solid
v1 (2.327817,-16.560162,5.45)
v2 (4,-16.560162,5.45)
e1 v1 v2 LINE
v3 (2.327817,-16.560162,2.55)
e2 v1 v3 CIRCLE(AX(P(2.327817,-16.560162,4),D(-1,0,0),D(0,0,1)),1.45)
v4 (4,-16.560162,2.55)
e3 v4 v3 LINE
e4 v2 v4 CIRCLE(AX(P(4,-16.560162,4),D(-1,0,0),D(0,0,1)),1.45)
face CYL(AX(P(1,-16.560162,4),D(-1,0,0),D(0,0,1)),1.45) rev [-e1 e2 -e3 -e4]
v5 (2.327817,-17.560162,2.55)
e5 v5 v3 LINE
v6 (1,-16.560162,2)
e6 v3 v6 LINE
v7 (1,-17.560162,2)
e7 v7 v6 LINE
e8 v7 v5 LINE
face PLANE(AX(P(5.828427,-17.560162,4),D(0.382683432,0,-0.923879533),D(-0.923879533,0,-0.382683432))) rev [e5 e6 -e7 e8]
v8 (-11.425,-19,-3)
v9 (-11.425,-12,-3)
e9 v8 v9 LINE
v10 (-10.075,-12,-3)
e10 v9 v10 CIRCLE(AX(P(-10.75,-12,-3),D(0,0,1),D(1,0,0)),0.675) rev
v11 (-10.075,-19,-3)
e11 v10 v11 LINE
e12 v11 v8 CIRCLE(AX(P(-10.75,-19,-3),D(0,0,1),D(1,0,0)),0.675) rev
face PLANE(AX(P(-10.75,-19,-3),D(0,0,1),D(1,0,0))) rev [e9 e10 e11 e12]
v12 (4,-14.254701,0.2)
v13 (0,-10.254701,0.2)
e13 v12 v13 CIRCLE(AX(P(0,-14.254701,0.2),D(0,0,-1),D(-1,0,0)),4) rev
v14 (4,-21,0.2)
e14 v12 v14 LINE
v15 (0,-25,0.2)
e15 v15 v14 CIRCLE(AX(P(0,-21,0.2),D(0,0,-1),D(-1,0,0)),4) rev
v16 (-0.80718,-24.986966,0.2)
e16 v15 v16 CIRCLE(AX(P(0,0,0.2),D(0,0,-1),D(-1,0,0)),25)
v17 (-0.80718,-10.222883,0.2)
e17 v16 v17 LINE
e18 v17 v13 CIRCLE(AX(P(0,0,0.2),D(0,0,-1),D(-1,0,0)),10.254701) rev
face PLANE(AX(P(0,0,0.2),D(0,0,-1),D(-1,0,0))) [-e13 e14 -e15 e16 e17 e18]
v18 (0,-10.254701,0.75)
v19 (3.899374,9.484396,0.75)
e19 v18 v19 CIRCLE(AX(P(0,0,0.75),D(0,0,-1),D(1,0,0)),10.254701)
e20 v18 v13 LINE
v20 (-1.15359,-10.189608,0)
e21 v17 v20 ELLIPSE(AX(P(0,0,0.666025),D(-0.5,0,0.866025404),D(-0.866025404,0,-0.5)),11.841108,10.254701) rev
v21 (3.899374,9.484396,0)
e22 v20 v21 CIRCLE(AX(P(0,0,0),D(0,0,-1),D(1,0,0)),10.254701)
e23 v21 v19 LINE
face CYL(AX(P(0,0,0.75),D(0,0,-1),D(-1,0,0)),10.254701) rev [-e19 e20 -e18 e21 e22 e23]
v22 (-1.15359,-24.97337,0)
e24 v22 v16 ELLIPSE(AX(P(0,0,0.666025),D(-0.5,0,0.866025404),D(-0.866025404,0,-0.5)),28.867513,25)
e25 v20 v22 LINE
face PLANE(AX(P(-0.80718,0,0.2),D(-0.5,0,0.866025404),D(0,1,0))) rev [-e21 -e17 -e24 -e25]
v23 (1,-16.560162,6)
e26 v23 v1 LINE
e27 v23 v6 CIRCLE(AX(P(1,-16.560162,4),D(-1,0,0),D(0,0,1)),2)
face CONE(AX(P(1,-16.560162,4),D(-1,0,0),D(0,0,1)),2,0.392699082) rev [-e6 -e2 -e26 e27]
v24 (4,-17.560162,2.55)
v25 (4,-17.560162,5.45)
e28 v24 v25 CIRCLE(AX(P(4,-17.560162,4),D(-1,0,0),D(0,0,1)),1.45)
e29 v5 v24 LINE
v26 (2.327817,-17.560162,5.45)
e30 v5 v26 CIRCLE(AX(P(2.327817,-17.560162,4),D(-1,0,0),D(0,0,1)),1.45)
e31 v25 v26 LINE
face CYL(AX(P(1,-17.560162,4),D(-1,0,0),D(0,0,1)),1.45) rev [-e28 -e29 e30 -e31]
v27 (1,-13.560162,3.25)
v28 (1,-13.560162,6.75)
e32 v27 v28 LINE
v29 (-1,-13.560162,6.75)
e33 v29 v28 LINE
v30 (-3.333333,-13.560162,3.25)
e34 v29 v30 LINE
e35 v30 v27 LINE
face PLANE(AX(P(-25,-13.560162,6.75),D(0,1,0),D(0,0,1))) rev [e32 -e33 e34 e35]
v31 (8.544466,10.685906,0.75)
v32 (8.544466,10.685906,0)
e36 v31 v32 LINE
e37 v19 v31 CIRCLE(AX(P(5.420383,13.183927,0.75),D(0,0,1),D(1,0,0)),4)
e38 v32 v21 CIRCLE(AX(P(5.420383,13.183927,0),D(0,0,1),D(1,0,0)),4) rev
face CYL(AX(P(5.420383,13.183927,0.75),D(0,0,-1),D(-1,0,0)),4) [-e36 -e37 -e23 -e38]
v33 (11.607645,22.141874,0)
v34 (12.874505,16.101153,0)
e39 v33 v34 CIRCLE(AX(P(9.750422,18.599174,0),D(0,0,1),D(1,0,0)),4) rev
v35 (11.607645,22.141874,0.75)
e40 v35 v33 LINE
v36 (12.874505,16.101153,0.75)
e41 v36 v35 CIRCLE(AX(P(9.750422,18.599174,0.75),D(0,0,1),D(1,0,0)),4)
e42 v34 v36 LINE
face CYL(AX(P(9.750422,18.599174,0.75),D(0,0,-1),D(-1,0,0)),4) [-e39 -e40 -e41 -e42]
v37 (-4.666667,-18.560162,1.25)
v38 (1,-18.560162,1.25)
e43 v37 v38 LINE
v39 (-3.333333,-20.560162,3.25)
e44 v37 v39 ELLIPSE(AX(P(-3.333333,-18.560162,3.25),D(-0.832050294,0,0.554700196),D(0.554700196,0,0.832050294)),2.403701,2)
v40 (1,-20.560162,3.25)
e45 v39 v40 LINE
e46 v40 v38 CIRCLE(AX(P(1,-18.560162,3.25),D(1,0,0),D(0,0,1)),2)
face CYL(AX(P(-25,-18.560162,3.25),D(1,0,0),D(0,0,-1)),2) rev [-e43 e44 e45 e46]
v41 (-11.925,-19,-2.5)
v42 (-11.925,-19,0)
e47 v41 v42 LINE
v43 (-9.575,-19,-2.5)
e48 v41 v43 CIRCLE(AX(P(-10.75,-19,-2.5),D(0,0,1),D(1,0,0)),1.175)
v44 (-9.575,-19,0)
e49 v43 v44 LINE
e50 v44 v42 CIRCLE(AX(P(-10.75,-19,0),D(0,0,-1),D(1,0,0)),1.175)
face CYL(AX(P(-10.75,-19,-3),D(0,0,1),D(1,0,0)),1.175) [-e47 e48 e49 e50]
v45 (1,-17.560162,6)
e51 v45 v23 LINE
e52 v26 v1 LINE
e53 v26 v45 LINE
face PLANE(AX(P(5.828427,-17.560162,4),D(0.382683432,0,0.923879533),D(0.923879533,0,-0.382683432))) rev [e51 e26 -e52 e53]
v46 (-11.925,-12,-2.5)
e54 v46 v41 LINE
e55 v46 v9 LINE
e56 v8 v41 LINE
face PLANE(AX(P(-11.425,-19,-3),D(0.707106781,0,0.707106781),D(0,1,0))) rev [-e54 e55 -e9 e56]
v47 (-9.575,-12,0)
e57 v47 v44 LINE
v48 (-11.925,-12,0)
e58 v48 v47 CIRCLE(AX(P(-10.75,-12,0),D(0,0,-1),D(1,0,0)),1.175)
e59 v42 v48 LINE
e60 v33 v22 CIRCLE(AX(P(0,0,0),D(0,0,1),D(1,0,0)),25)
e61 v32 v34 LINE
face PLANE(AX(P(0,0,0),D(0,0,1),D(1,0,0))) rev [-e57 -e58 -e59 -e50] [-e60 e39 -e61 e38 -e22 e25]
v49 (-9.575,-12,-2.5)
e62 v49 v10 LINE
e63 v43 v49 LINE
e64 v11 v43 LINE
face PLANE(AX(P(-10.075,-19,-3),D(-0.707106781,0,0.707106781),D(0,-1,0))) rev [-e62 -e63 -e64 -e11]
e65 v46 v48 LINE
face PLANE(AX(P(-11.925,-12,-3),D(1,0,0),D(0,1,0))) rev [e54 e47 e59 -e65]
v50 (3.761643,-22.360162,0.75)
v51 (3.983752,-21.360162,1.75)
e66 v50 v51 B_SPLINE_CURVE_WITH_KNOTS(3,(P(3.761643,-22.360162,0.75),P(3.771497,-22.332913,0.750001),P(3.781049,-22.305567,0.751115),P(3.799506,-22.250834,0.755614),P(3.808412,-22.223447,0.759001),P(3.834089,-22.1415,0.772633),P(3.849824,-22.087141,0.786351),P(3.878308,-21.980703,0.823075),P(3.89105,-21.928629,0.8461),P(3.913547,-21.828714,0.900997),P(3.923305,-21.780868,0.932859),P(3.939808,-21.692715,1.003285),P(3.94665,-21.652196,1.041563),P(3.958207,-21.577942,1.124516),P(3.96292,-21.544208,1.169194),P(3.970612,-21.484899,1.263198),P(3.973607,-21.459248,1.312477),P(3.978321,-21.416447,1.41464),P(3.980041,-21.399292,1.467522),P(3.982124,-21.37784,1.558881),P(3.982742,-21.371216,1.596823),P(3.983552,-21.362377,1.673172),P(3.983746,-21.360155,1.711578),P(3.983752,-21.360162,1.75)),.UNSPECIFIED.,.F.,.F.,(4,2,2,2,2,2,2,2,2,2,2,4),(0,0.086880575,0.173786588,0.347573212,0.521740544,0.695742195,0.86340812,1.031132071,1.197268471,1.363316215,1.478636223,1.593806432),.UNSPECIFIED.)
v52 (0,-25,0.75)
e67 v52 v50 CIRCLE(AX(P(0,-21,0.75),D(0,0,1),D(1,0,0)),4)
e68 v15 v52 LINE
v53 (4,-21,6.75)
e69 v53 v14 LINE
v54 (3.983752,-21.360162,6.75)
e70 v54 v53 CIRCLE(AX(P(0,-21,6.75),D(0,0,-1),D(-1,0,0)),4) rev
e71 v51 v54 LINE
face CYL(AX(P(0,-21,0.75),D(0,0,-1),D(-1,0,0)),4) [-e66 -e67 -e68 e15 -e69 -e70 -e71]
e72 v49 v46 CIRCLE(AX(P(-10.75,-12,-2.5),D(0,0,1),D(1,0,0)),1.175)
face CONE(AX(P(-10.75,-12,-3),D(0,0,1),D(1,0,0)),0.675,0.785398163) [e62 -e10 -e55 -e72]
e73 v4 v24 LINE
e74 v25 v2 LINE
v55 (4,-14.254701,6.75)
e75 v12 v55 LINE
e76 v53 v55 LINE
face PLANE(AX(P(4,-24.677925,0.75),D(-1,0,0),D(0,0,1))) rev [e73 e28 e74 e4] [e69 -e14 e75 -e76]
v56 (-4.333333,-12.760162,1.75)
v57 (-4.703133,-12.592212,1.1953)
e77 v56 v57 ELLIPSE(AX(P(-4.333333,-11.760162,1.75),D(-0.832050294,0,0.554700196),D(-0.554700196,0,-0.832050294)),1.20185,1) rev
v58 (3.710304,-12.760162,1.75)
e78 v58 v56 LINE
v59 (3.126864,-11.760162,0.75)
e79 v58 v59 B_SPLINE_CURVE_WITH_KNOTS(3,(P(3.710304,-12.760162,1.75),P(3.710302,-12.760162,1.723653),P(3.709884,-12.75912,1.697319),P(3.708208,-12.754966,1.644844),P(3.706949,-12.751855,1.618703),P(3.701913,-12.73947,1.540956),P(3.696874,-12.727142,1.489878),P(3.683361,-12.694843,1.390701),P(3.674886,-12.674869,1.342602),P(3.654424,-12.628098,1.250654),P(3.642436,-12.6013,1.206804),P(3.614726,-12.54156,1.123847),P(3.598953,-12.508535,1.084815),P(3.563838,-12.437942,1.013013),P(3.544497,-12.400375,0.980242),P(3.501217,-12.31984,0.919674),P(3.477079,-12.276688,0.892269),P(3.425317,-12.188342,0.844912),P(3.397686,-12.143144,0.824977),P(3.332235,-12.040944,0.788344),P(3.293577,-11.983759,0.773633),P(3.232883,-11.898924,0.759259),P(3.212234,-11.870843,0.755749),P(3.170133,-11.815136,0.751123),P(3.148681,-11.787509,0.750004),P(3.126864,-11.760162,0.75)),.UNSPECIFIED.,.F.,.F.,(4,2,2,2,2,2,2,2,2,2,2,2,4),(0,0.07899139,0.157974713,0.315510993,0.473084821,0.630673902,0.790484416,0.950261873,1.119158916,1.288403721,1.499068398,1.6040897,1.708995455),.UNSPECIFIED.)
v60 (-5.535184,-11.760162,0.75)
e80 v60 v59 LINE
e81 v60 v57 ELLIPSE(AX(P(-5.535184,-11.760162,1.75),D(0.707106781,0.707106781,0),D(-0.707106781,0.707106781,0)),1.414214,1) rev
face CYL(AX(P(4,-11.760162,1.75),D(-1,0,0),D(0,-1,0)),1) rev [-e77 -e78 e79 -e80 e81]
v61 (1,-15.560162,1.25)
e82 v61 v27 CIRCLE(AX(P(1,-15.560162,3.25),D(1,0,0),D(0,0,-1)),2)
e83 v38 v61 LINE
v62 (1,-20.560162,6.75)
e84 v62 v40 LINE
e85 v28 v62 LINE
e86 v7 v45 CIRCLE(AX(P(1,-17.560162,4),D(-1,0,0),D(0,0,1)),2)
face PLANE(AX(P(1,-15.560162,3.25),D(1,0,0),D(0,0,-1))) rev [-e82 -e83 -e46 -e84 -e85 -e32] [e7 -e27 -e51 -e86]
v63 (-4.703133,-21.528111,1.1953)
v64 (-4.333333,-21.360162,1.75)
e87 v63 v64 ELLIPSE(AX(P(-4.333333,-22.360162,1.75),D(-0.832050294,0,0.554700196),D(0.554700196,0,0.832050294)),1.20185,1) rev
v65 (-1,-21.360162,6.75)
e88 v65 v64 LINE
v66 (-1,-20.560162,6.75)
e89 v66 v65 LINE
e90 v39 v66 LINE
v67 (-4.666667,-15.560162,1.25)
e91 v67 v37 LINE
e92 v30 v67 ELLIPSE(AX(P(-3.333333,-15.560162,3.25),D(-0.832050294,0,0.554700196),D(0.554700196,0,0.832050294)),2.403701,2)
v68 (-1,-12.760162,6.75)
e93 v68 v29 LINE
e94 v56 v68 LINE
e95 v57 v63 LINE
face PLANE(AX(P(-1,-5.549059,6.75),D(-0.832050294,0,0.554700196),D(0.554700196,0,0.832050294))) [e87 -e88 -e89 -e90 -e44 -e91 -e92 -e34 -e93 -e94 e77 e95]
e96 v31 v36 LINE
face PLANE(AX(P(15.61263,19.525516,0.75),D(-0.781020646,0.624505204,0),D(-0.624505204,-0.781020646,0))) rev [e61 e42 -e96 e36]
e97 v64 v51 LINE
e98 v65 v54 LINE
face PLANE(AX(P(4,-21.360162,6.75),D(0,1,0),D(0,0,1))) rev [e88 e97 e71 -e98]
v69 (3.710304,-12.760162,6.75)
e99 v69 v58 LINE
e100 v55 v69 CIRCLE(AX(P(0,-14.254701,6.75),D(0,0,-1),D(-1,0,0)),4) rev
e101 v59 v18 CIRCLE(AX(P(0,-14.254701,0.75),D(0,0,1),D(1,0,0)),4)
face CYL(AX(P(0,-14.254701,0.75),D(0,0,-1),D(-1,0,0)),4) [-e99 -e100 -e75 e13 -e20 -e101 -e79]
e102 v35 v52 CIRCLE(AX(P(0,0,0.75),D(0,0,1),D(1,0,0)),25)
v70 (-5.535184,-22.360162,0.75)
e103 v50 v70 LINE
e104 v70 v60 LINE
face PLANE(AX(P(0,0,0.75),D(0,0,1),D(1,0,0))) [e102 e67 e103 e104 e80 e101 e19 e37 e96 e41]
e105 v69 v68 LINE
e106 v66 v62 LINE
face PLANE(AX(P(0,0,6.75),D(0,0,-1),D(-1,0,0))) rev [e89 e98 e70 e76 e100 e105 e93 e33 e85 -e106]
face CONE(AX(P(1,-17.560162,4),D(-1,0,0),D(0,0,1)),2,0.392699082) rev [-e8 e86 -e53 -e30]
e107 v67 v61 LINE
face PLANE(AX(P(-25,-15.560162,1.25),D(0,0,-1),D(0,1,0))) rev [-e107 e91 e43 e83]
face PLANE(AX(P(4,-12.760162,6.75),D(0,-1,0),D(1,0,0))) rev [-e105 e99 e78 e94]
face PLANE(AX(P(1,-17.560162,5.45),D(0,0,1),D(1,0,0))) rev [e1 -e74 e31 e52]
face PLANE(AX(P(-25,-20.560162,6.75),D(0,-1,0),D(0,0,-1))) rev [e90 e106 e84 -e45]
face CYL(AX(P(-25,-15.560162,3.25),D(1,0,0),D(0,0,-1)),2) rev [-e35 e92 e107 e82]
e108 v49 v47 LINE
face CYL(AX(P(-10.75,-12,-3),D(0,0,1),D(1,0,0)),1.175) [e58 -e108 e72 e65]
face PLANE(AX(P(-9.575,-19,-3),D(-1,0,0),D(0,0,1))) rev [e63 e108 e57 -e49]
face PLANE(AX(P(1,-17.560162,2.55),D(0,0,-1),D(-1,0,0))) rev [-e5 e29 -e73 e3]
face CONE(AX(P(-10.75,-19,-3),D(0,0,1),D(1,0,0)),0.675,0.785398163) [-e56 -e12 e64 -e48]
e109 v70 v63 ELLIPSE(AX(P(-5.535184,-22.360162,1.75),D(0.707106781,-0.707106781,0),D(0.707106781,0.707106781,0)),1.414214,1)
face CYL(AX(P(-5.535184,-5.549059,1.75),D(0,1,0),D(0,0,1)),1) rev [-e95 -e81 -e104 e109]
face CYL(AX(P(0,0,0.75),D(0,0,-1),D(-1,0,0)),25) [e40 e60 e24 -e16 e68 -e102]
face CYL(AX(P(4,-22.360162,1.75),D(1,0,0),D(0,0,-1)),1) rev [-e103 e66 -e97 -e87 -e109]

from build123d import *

# Parameters (mm, degrees)
BASE_FLANGE_DEPTH          = 0.75
MOUNT_PEG_DEPTH            = 3
SKETCH4_W                  = 5
SKETCH4_H                  = 8.6
SCREW_BOSS_DEPTH           = 6
SCREW_BOSS_CHAMFER_DEPTH   = 8.6
SCREW_START                = -3
SCREW_BOSS_CLEARANCE_DEPTH = 36.87881814
M2_5_START                 = 1
M2_5_CLEARANCE_SLOT1_DEPTH = 3
PEG_CHAMFER_SIZE           = 0.5
FILLET1_R                  = 1
FILLET2_R                  = 4
SKETCH9_W                  = 5.5
SKETCH9_H                  = 16.180617206
CUT_EXTRUDE1_DEPTH         = 0.2
CHAMFER1_SIZE              = 0.692820323
CHAMFER1_SIZE_2            = 0.4


with BuildPart() as part:
    # Sketch1 → base flange (new body)
    with BuildSketch(Plane.XY):
        with BuildLine():
            Line((4, -24.677925359), (4, -9.442398166))
            ThreePointArc((4, -9.442398166), (-10.158758778, 1.399465338), (6.404113855, 8.009132841))
            Line((6.404113855, 8.009132841), (15.612630109, 19.525516154))
            ThreePointArc((15.612630109, 19.525516154), (-24.179534225, 6.352174798), (4, -24.677925359))
        make_face()
    extrude(amount=BASE_FLANGE_DEPTH)

    # Sketch3 → mount peg (add)
    with BuildSketch(Plane(origin=(0, 0, 0), x_dir=(-1, 0, 0), z_dir=(0, 0, -1))):
        with BuildLine():
            Line((9.575, -19), (9.575, -12))
            ThreePointArc((9.575, -12), (10.75, -10.825), (11.925, -12))
            Line((11.925, -12), (11.925, -19))
            ThreePointArc((11.925, -19), (10.75, -20.175), (9.575, -19))
        make_face()
    extrude(amount=MOUNT_PEG_DEPTH)

    # Sketch4 → screw boss (add)
    with BuildSketch(Plane.XY.offset(0.75)):
        with Locations((1.5, -17.060161762)):
            Rectangle(SKETCH4_W, SKETCH4_H)
    extrude(amount=SCREW_BOSS_DEPTH)

    # Sketch5 → screw boss chamfer (add)
    with BuildSketch(Plane.XZ.offset(21.360161762)):
        Polygon((-1, 0.75), (-1, 6.75), (-5, 0.75), align=None)
    extrude(amount=-SCREW_BOSS_CHAMFER_DEPTH)

    # Sketch6 → screw boss clearance (cut, through all)
    with BuildSketch(Plane(origin=(4, 0, 0), x_dir=(0, 0, -1), z_dir=(1, 0, 0)).offset(SCREW_START)):
        with BuildLine():
            Line((-6.75, -20.560161762), (-3.25, -20.560161762))
            ThreePointArc((-3.25, -20.560161762), (-1.835786438, -19.974375325), (-1.25, -18.560161762))
            Line((-1.25, -18.560161762), (-1.25, -15.560161762))
            ThreePointArc((-1.25, -15.560161762), (-1.835786438, -14.1459482), (-3.25, -13.560161762))
            Line((-3.25, -13.560161762), (-6.75, -13.560161762))
            Line((-6.75, -13.560161762), (-6.75, -20.560161762))
        make_face()
    extrude(amount=-SCREW_BOSS_CLEARANCE_DEPTH, mode=Mode.SUBTRACT)

    # M2.5 Clearance Slot1: read off the stored shape, not the designer's step
    # M2.5 Clearance Slot1 outline → M2.5 Clearance Slot1 (cut)
    with BuildSketch(Plane.YZ.offset(M2_5_START)):
        with BuildLine():
            ThreePointArc((-17.560161762, 5.45), (-19.010161762, 4), (-17.560161762, 2.55))
            Line((-17.560161762, 2.55), (-16.560161762, 2.55))
            ThreePointArc((-16.560161762, 2.55), (-15.110161762, 4), (-16.560161762, 5.45))
            Line((-16.560161762, 5.45), (-17.560161762, 5.45))
        make_face()
    extrude(amount=M2_5_CLEARANCE_SLOT1_DEPTH, mode=Mode.SUBTRACT)

    # M2.5 Clearance Slot1 2: loft between two sections, ruled curve by curve
    m2_5_clearance_slot1_2_from = [
        Edge.make_three_point_arc((2.327817459, -16.560161762, 5.45), (2.327817459, -15.53485693, 5.025304833), (2.327817459, -15.110161762, 4)),
        Edge.make_three_point_arc((2.327817459, -15.110161762, 4), (2.327817459, -15.53485693, 2.974695167), (2.327817459, -16.560161762, 2.55)),
        Edge.make_three_point_arc((2.327817459, -17.560161762, 2.55), (2.327817459, -18.585466595, 2.974695167), (2.327817459, -19.010161762, 4)),
        Edge.make_three_point_arc((2.327817459, -19.010161762, 4), (2.327817459, -18.585466595, 5.025304833), (2.327817459, -17.560161762, 5.45)),
        Edge.make_line((2.327817459, -16.560161762, 2.55), (2.327817459, -17.560161762, 2.55)),
        Edge.make_line((2.327817459, -16.560161762, 5.45), (2.327817459, -17.560161762, 5.45)),
    ]
    m2_5_clearance_slot1_2_to = [
        Edge.make_three_point_arc((1, -16.560161762, 6), (1, -15.1459482, 5.414213562), (1, -14.560161762, 4)),
        Edge.make_three_point_arc((1, -14.560161762, 4), (1, -15.1459482, 2.585786438), (1, -16.560161762, 2)),
        Edge.make_three_point_arc((1, -17.560161762, 2), (1, -18.974375325, 2.585786438), (1, -19.560161762, 4)),
        Edge.make_three_point_arc((1, -19.560161762, 4), (1, -18.974375325, 5.414213562), (1, -17.560161762, 6)),
        Edge.make_line((1, -16.560161762, 2), (1, -17.560161762, 2)),
        Edge.make_line((1, -16.560161762, 6), (1, -17.560161762, 6)),
    ]
    m2_5_clearance_slot1_2 = Solid(Shell([*[Face.make_surface_from_curves(m2_5_clearance_slot1_2_from[k], m2_5_clearance_slot1_2_to[k]) for k in range(6)], Face(Wire(m2_5_clearance_slot1_2_from)), Face(Wire(m2_5_clearance_slot1_2_to))]))
    add(m2_5_clearance_slot1_2, mode=Mode.SUBTRACT)

    # peg chamfer
    peg_chamfer_edges = [part.edges().sort_by_distance(p)[0] for p in [
        (-10.75, -20.175, -3),
        (-11.925, -15.5, -3),
        (-10.75, -10.825, -3),
        (-9.575, -15.5, -3),
    ]]
    chamfer(peg_chamfer_edges, length=PEG_CHAMFER_SIZE)

    # Fillet1
    fillet1_edges = [part.edges().sort_by_distance(p)[0] for p in [
        (-0.5, -12.760161762, 0.75),
        (-0.5, -21.360161762, 0.75),
        (-5, -17.060161762, 0.75),
    ]]
    fillet(fillet1_edges, radius=FILLET1_R)

    # Fillet2
    fillet2_edges = [part.edges().sort_by_distance(p)[0] for p in [
        (4, -9.442398166, 0.375),
        (4, -24.677925359, 0.375),
        (15.612630109, 19.525516154, 0.375),
        (6.404113855, 8.009132841, 0.375),
    ]]
    fillet(fillet2_edges, radius=FILLET2_R)

    # Sketch9 → Cut-Extrude1 (cut)
    with BuildSketch(Plane(origin=(0, 0, 0), x_dir=(-1, 0, 0), z_dir=(0, 0, -1))):
        with Locations((-1.25, -17.718085194)):
            Rectangle(SKETCH9_W, SKETCH9_H)
    extrude(amount=-CUT_EXTRUDE1_DEPTH, mode=Mode.SUBTRACT)

    # Chamfer1
    # the kernel refuses this chamfer: 0.692820323, 0.4 mm, written as the material it adds along each edge
    with BuildSketch(Plane(origin=(-1.5, -26.747345015, 0.2), x_dir=(1, 0, 0), z_dir=(0, 1, 0))) as chamfer1_piece_1_section:
        Polygon((CHAMFER1_SIZE, 0), (0, CHAMFER1_SIZE_2), (0, 0), align=None)
    chamfer1_piece_1 = extrude(amount=18.395329037, mode=Mode.PRIVATE)
    chamfer1_piece_1 = chamfer1_piece_1 & Plane(origin=(0, 0, 0.2), x_dir=(0.6245052043696531, 0.7810206461516994, 0), z_dir=(0, 0, -1)) * Cylinder(25, 40, mode=Mode.PRIVATE)
    chamfer1_piece_1 = chamfer1_piece_1 - Plane(origin=(0, 0, 0.2), x_dir=(0.39006502286727884, -0.9207873141695369, 0), z_dir=(0, 0, -1)) * Cylinder(10.254700538, 40, mode=Mode.PRIVATE)
    chamfer1_piece_1 = split(chamfer1_piece_1, bisect_by=Plane(origin=(-1.5, -26.747345015, 0), z_dir=(0, 0, 1)), keep=Keep.TOP, mode=Mode.PRIVATE)
    add(chamfer1_piece_1)


solid = part.part
